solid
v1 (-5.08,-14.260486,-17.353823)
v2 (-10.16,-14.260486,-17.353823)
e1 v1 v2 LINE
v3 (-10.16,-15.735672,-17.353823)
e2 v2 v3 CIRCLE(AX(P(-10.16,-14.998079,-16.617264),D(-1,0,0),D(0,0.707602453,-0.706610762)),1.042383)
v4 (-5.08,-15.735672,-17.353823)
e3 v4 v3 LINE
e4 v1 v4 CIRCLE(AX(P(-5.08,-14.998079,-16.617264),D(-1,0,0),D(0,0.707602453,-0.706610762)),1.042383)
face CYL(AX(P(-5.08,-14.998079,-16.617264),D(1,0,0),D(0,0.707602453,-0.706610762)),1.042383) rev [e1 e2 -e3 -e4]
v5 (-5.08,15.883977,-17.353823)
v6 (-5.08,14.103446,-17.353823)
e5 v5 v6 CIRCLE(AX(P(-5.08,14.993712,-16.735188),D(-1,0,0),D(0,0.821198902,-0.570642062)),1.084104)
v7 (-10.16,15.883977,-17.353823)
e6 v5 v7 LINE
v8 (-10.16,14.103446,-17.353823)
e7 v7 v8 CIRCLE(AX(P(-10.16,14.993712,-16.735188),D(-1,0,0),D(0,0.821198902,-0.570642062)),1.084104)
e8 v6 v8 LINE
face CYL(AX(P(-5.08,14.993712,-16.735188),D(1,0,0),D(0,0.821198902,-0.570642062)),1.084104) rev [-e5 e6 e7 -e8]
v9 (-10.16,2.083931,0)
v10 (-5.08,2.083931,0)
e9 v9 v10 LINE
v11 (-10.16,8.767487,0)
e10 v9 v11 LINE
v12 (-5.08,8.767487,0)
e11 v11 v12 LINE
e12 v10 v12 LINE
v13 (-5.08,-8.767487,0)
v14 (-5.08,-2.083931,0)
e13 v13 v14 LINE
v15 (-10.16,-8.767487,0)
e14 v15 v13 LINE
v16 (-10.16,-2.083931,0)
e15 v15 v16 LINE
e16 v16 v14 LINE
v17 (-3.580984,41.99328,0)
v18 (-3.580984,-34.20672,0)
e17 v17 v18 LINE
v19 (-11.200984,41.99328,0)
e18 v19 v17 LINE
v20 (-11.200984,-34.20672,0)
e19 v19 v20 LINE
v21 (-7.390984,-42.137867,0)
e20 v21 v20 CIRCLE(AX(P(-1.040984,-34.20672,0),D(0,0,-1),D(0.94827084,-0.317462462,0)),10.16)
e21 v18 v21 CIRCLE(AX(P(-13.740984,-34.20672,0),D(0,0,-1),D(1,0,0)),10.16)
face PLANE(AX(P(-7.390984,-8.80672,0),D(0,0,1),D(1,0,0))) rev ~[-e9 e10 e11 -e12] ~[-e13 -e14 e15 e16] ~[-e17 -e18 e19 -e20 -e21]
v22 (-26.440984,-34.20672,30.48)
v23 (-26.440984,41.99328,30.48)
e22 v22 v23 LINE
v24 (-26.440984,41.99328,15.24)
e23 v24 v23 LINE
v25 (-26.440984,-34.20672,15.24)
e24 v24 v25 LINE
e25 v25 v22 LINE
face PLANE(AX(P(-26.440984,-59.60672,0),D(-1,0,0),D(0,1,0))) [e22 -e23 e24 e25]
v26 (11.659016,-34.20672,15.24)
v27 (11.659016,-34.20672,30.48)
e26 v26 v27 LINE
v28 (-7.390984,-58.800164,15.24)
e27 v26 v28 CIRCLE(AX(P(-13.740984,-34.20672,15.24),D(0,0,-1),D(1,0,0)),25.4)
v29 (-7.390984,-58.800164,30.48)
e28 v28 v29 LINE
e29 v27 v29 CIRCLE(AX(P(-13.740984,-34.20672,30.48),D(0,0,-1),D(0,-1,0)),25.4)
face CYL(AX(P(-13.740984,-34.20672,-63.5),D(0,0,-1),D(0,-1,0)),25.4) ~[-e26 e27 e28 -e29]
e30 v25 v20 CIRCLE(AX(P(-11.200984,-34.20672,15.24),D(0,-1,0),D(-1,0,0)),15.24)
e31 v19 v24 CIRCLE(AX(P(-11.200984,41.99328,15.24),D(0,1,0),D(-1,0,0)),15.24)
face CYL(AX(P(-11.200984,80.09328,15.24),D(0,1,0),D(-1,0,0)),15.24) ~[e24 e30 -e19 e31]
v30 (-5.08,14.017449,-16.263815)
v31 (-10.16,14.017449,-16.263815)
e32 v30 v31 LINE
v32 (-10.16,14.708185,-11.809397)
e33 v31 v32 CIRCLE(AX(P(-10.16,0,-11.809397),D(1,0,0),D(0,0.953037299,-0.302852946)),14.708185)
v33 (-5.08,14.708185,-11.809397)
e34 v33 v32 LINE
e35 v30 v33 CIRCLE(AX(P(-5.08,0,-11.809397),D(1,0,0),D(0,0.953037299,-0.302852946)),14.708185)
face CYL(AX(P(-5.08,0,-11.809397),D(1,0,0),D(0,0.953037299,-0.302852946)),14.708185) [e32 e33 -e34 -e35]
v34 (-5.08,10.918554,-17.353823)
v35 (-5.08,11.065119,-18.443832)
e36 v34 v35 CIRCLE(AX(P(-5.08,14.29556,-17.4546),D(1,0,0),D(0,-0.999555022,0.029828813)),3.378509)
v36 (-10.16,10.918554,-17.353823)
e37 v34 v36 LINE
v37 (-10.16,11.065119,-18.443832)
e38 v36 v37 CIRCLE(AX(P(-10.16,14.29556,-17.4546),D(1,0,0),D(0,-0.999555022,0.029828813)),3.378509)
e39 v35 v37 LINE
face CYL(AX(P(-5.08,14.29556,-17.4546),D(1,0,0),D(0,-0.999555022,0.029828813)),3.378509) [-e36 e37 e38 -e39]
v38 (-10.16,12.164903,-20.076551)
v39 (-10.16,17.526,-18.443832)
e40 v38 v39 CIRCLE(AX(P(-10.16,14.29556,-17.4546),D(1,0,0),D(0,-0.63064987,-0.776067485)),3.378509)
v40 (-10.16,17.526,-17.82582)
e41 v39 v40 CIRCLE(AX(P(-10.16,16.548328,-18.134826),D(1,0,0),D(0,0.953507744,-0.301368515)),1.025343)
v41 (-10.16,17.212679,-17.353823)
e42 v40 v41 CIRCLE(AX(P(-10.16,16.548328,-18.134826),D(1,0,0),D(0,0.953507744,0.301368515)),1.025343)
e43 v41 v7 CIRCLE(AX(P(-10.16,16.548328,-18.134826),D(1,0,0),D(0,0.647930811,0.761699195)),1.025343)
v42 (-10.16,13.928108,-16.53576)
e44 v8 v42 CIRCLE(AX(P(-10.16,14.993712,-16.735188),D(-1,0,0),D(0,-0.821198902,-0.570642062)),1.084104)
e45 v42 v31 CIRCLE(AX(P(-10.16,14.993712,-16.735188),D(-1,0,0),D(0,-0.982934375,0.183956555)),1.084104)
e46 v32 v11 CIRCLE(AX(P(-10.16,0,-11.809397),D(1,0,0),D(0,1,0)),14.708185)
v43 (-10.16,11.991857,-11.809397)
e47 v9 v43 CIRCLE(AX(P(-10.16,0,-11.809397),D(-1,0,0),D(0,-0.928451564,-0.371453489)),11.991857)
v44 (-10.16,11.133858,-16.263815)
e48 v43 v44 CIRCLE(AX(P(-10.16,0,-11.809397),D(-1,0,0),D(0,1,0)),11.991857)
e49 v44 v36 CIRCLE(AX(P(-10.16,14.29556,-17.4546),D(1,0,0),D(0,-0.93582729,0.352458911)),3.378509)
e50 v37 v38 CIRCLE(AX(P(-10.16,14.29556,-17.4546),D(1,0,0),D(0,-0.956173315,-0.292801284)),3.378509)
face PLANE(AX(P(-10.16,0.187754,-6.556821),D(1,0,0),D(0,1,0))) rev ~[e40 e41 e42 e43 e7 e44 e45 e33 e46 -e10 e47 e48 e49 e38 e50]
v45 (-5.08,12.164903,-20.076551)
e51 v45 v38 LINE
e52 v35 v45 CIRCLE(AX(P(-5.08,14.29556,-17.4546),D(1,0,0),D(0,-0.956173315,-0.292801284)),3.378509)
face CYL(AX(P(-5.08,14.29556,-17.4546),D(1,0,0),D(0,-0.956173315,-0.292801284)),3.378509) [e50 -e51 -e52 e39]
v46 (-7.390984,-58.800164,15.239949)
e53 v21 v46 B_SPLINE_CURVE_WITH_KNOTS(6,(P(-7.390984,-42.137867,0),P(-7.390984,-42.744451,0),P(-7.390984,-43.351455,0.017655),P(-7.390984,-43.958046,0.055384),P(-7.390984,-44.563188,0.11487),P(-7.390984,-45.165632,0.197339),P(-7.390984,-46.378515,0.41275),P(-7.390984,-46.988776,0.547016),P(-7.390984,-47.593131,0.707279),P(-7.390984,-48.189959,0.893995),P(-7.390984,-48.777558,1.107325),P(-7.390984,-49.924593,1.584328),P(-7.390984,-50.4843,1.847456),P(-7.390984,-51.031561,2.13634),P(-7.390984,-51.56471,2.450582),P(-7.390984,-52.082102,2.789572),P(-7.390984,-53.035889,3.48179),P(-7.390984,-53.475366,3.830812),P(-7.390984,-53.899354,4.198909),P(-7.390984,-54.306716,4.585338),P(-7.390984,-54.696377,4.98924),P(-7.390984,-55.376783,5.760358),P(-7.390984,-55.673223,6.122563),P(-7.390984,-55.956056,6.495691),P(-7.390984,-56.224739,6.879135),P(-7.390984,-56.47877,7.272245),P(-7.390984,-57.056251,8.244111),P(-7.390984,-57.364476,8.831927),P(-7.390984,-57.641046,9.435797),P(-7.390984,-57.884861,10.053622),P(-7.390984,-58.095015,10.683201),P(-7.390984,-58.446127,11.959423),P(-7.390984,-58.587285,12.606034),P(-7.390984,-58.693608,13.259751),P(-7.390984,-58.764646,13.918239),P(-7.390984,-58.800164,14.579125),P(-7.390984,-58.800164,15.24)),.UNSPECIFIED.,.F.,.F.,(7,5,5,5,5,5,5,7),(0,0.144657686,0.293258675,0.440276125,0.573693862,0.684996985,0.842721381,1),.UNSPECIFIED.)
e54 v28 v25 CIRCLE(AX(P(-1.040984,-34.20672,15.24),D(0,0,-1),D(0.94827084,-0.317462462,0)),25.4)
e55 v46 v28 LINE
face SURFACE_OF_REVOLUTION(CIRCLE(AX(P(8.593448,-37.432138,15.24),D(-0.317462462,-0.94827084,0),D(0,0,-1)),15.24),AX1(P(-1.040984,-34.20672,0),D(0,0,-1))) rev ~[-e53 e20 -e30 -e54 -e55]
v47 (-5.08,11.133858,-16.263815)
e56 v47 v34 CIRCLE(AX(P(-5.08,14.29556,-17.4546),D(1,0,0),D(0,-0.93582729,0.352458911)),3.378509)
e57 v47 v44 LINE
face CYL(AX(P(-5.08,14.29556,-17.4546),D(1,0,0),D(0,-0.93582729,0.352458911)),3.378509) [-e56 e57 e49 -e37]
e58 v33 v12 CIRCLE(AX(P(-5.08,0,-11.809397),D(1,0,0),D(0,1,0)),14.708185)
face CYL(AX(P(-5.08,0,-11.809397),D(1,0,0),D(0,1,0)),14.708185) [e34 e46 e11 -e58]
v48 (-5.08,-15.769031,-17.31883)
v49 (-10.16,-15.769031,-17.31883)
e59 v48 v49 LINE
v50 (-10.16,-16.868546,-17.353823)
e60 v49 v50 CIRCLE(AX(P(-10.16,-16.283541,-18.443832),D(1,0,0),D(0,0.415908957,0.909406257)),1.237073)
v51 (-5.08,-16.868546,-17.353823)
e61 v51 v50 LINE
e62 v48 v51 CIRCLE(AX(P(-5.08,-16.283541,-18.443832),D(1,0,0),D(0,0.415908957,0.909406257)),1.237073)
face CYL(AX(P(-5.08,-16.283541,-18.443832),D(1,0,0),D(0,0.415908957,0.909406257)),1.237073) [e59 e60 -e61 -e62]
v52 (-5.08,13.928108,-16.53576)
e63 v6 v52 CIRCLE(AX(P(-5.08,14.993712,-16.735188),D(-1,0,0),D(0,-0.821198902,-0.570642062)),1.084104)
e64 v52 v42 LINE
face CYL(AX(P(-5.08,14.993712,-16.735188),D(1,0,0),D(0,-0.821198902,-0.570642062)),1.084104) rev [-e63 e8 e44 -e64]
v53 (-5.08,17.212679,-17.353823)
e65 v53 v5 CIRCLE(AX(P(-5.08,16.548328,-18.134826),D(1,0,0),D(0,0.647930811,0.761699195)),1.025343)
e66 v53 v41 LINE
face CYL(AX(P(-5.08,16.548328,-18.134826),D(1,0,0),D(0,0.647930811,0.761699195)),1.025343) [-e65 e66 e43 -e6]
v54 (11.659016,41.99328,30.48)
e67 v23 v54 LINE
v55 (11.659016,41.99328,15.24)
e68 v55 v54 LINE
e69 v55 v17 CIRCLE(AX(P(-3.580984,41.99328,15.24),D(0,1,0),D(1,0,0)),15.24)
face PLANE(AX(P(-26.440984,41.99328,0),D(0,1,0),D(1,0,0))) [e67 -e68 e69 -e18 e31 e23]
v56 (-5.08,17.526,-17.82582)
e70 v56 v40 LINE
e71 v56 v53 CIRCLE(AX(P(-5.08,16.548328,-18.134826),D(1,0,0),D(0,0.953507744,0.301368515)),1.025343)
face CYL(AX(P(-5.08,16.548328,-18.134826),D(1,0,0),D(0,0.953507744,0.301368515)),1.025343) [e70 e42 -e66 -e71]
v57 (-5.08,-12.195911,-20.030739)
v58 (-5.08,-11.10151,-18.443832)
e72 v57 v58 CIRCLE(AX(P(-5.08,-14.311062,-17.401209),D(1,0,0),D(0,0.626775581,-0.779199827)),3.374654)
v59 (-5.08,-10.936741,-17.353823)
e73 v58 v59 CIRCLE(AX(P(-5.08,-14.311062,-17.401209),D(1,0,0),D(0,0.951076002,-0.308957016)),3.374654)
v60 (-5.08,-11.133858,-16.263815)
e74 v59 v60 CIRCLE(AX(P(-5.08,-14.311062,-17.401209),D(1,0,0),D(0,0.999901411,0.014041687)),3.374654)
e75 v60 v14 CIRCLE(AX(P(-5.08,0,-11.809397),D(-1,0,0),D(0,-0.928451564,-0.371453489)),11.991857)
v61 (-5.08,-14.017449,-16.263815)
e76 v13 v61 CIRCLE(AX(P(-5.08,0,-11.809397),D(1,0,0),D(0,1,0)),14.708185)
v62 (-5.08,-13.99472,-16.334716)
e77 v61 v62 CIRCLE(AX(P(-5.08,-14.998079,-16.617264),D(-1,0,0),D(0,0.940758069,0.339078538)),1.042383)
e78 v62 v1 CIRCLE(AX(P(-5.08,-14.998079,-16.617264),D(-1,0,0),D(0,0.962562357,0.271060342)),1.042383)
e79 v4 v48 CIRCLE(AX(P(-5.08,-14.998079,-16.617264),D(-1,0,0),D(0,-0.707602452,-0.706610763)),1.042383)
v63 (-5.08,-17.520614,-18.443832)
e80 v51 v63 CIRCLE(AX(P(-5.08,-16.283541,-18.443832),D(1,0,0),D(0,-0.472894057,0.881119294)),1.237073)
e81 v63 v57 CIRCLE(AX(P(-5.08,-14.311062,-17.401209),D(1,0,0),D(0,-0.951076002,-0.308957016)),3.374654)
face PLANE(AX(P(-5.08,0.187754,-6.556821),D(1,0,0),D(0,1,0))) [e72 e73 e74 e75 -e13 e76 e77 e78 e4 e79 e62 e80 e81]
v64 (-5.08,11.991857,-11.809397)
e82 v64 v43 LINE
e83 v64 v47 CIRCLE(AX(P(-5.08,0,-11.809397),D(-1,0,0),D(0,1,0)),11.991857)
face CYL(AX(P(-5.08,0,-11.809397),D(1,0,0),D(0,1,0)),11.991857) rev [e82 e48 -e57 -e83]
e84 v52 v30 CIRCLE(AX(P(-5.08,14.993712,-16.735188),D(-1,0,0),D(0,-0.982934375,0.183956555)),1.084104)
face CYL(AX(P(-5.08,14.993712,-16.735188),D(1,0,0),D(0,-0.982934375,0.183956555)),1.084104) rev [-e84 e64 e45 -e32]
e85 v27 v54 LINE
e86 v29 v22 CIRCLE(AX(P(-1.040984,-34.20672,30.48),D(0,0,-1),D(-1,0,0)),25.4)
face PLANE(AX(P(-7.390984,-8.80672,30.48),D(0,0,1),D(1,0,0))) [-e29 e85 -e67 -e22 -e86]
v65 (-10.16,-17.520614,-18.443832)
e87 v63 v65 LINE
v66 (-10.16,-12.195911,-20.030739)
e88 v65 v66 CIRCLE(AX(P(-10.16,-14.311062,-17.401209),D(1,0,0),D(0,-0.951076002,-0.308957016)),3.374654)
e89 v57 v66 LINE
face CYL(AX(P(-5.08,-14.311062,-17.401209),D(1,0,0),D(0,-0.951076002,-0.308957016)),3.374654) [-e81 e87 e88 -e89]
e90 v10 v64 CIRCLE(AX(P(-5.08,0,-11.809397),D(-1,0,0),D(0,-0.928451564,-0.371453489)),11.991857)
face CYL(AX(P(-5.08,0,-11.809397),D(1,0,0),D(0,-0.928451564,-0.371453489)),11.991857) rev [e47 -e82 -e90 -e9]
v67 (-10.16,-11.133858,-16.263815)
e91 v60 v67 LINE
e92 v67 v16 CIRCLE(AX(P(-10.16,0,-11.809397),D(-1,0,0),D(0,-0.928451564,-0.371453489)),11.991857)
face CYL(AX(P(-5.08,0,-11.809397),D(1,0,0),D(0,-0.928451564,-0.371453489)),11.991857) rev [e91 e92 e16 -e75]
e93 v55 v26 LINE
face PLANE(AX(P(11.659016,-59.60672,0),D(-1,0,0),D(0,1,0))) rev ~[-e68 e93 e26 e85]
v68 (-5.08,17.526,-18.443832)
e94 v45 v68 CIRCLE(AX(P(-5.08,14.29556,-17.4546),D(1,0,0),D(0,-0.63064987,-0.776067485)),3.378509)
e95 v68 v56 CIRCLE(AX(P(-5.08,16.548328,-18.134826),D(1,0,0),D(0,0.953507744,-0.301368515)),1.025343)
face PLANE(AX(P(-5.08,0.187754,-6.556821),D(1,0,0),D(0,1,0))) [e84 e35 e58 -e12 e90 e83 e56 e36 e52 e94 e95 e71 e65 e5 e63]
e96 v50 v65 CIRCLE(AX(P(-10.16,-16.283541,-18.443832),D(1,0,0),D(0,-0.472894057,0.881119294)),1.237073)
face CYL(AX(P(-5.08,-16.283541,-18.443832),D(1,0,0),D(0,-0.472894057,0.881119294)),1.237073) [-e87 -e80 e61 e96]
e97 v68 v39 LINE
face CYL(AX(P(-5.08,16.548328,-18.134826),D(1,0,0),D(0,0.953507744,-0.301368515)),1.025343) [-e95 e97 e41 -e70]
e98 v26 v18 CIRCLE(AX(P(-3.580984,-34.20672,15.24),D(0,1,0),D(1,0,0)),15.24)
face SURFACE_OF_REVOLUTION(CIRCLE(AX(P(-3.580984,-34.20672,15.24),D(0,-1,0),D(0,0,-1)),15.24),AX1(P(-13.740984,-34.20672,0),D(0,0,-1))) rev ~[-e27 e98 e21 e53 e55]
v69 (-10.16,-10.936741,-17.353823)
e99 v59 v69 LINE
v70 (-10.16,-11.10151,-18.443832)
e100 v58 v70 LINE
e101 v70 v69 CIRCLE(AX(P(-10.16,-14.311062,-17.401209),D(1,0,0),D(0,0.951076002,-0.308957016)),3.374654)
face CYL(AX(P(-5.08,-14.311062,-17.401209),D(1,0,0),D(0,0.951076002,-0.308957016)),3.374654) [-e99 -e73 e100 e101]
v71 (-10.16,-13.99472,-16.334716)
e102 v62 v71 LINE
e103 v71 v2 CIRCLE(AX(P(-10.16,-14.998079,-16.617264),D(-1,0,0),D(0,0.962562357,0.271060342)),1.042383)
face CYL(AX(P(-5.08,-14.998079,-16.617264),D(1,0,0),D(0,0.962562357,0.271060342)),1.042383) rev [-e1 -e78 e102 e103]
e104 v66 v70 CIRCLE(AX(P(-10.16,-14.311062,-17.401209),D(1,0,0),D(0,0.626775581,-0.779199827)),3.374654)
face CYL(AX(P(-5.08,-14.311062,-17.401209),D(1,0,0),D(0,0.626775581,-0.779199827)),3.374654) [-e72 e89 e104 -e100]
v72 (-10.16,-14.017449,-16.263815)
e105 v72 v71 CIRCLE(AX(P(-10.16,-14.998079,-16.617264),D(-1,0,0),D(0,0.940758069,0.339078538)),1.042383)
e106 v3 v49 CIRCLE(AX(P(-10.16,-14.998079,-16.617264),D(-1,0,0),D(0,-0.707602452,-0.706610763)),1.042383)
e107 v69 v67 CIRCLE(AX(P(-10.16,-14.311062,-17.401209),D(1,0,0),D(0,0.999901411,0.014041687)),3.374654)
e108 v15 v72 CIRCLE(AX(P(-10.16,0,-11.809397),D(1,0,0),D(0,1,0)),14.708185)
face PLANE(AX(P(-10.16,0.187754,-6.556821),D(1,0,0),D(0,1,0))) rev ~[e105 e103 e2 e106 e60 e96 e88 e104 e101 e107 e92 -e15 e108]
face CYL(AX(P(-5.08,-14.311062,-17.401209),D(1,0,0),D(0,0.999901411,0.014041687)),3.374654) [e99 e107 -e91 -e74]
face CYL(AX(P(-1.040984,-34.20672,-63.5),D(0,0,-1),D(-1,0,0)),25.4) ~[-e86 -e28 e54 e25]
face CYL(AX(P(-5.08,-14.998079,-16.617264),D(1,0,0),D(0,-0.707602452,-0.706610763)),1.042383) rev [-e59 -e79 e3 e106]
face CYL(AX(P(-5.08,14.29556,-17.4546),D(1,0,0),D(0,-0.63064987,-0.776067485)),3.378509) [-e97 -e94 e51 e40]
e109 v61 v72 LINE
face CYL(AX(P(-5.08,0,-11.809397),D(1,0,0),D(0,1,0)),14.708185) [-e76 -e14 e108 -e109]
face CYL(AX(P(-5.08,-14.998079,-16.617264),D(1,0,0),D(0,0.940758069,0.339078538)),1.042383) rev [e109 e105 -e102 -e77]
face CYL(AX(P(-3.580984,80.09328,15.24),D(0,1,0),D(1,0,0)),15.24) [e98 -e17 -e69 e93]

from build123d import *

# Parameters (mm, degrees)
F0_W        = 38.1
F0_H        = 101.6
F1_DEPTH    = 30.48
F2_T1_DEPTH = 157.48
F5_DEPTH    = 5.08
F6_T1_DEPTH = 114.3
F6_T4_ANGLE = 161.4904654603
F6_T6_ANGLE = 161.4904654612


# Not quite as in the source:
# - a fillet or chamfer that OpenCascade refuses, or shapes differently, is made with other operations: its cross-section is extruded or revolved along the edge and cut away or added


with BuildPart() as f1:
    # F0 (on Top) → F1 (new body)
    with BuildSketch(Plane.XY):
        with Locations((-7.3909840986, -8.8067197621)):
            Rectangle(F0_W, F0_H)
    extrude(amount=F1_DEPTH)

    # F2: fillet of radius 25.4 on 2 edges, made by hand

    # F2_s2 → F2_t1 (cut)
    with BuildSketch(Plane.XY.offset(-63.5)):
        with BuildLine():
            ThreePointArc((-13.7409840986, -59.6067197621), (4.2195281435, -52.1672320042), (11.6590159014, -34.2067197621))
            Line((11.6590159014, -34.2067197621), (11.6590159014, -59.6067197621))
            Line((11.6590159014, -59.6067197621), (-13.7409840986, -59.6067197621))
        make_face()
        with BuildLine():
            ThreePointArc((-26.4409840986, -34.2067197621), (-19.0014963408, -52.1672320042), (-1.0409840986, -59.6067197621))
            Line((-1.0409840986, -59.6067197621), (-26.4409840986, -59.6067197621))
            Line((-26.4409840986, -59.6067197621), (-26.4409840986, -34.2067197621))
        make_face()
    extrude(amount=F2_T1_DEPTH, mode=Mode.SUBTRACT)

    # F4 (on offset) → F5 (join)
    with BuildSketch(Plane.YZ.offset(-5.08)):
        with BuildLine():
            Line((-14.0174488836, -16.263814643), (-11.133858472, -16.263814643))
            ThreePointArc((-11.133858472, -16.263814643), (-2.2681486848, -0.0339935381), (11.991857098, -11.8093974888))
            ThreePointArc((11.991857098, -11.8093974888), (11.7754039507, -14.0775461736), (11.133858472, -16.263814643))
            Line((11.133858472, -16.263814643), (14.0174488836, -16.263814643))
            ThreePointArc((14.0174488836, -16.263814643), (14.5344751626, -14.0632247081), (14.7081849794, -11.8093974888))
            ThreePointArc((14.7081849794, -11.8093974888), (-2.2538272193, 2.7250776738), (-14.0174488836, -16.263814643))
        make_face()
        with BuildLine():
            ThreePointArc((-10.936740827, -17.3538234085), (-10.9902716166, -16.8006761373), (-11.133858472, -16.263814643))
            Line((-11.133858472, -16.263814643), (-14.0174488836, -16.263814643))
            ThreePointArc((-14.0174488836, -16.263814643), (-14.0054514358, -16.2990621553), (-13.9947204643, -16.3347156561))
            ThreePointArc((-13.9947204643, -16.3347156561), (-13.8183302749, -16.8476961899), (-13.6231437858, -17.3538234085))
            Line((-13.6231437858, -17.3538234085), (-10.936740827, -17.3538234085))
        make_face()
        with BuildLine():
            Line((14.0174488836, -16.263814643), (11.133858472, -16.263814643))
            ThreePointArc((11.133858472, -16.263814643), (10.9810910084, -16.799907635), (10.9185537399, -17.3538234085))
            Line((10.9185537399, -17.3538234085), (13.6231437858, -17.3538234085))
            ThreePointArc((13.6231437858, -17.3538234085), (13.781697315, -16.9470549808), (13.9281083774, -16.5357599818))
            ThreePointArc((13.9281083774, -16.5357599818), (13.9637636905, -16.3968256904), (14.0174488836, -16.263814643))
        make_face()
        with BuildLine():
            ThreePointArc((-11.1015096713, -18.4438321739), (-10.9743154761, -17.9056013647), (-10.936740827, -17.3538234085))
            Line((-10.936740827, -17.3538234085), (-13.6231437858, -17.3538234085))
            ThreePointArc((-13.6231437858, -17.3538234085), (-13.3861112566, -17.9038811268), (-13.1268801243, -18.4438321739))
            Line((-13.1268801243, -18.4438321739), (-11.1015096713, -18.4438321739))
        make_face()
        with BuildLine():
            Line((13.6231437858, -17.3538234085), (10.9185537399, -17.3538234085))
            ThreePointArc((10.9185537399, -17.3538234085), (10.9471844464, -17.9048318245), (11.0651192382, -18.4438321739))
            Line((11.0651192382, -18.4438321739), (13.1268801243, -18.4438321739))
            ThreePointArc((13.1268801243, -18.4438321739), (13.3861112566, -17.9038811268), (13.6231437858, -17.3538234085))
        make_face()
        with BuildLine():
            ThreePointArc((-13.6231437858, -17.3538234085), (-13.8183302749, -16.8476961899), (-13.9947204643, -16.3347156561))
            ThreePointArc((-13.9947204643, -16.3347156561), (-13.9894299583, -16.8803028031), (-14.2604863377, -17.3538234085))
            Line((-14.2604863377, -17.3538234085), (-13.6231437858, -17.3538234085))
        make_face()
        with BuildLine():
            ThreePointArc((-13.1268801243, -18.4438321739), (-13.3861112566, -17.9038811268), (-13.6231437858, -17.3538234085))
            Line((-13.6231437858, -17.3538234085), (-14.2604863377, -17.3538234085))
            ThreePointArc((-14.2604863377, -17.3538234085), (-14.9980791155, -17.659647367), (-15.7356718933, -17.3538234085))
            Line((-15.7356718933, -17.3538234085), (-16.868545512, -17.3538234085))
            ThreePointArc((-16.868545512, -17.3538234085), (-17.3451536393, -17.8087510018), (-17.5206139684, -18.4438321739))
            Line((-17.5206139684, -18.4438321739), (-13.1268801243, -18.4438321739))
        make_face()
        with BuildLine():
            ThreePointArc((-12.195911288, -20.0307388176), (-11.5329900367, -19.3170914758), (-11.1015096713, -18.4438321739))
            Line((-11.1015096713, -18.4438321739), (-13.1268801243, -18.4438321739))
            ThreePointArc((-13.1268801243, -18.4438321739), (-12.6862330658, -19.2518564902), (-12.195911288, -20.0307388176))
        make_face()
        with BuildLine():
            ThreePointArc((14.1034464611, -17.3538234085), (13.9336822531, -16.962387408), (13.9281083774, -16.5357599818))
            ThreePointArc((13.9281083774, -16.5357599818), (13.781697315, -16.9470549808), (13.6231437858, -17.3538234085))
            Line((13.6231437858, -17.3538234085), (14.1034464611, -17.3538234085))
        make_face()
        with BuildLine():
            Line((14.1034464611, -17.3538234085), (13.6231437858, -17.3538234085))
            ThreePointArc((13.6231437858, -17.3538234085), (13.3861112566, -17.9038811268), (13.1268801243, -18.4438321739))
            Line((13.1268801243, -18.4438321739), (17.526, -18.4438321739))
            Line((17.526, -18.4438321739), (17.526, -17.8258201323))
            ThreePointArc((17.526, -17.8258201323), (17.4025849977, -17.5677526977), (17.2126789083, -17.3538234085))
            Line((17.2126789083, -17.3538234085), (15.8839765936, -17.3538234085))
            ThreePointArc((15.8839765936, -17.3538234085), (14.9937115274, -17.8192920932), (14.1034464611, -17.3538234085))
        make_face()
        with BuildLine():
            Line((13.1268801243, -18.4438321739), (11.0651192382, -18.4438321739))
            ThreePointArc((11.0651192382, -18.4438321739), (11.4934563351, -19.3420700335), (12.1649032036, -20.0765514995))
            ThreePointArc((12.1649032036, -20.0765514995), (12.6722144503, -19.2757008789), (13.1268801243, -18.4438321739))
        make_face()
        with BuildLine():
            ThreePointArc((-12.195911288, -20.0307388176), (-12.6862330658, -19.2518564902), (-13.1268801243, -18.4438321739))
            Line((-13.1268801243, -18.4438321739), (-17.5206139684, -18.4438321739))
            ThreePointArc((-17.5206139684, -18.4438321739), (-15.2749066717, -20.6352919031), (-12.195911288, -20.0307388176))
        make_face()
        with BuildLine():
            Line((17.526, -18.4438321739), (13.1268801243, -18.4438321739))
            ThreePointArc((13.1268801243, -18.4438321739), (12.6722144503, -19.2757008789), (12.1649032036, -20.0765514995))
            ThreePointArc((12.1649032036, -20.0765514995), (15.2798483428, -20.6865502684), (17.526, -18.4438321739))
        make_face()
        with BuildLine():
            Line((-16.868545512, -17.3538234085), (-15.7356718933, -17.3538234085))
            ThreePointArc((-15.7356718933, -17.3538234085), (-15.7525545617, -17.3365203222), (-15.769031426, -17.3188303749))
            ThreePointArc((-15.769031426, -17.3188303749), (-16.3228921506, -17.2073853467), (-16.868545512, -17.3538234085))
        make_face()
        with BuildLine():
            ThreePointArc((17.2126789083, -17.3538234085), (16.548327751, -17.1094834068), (15.8839765936, -17.3538234085))
            Line((15.8839765936, -17.3538234085), (17.2126789083, -17.3538234085))
        make_face()
        with BuildLine():
            ThreePointArc((17.526, -18.4438321739), (17.5736704973, -18.1348261531), (17.526, -17.8258201323))
            Line((17.526, -17.8258201323), (17.526, -18.4438321739))
        make_face()
    extrude(amount=-F5_DEPTH)

    # F6: fillet of radius 15.24 on 4 edges, made by hand

    # F6_s2 → F6_t1 (cut)
    with BuildSketch(Plane.XZ.offset(-80.0932802379)):
        with BuildLine():
            ThreePointArc((11.6590159014, 15.24), (7.1953232467, 4.4636926547), (-3.5809840986, 0))
            Line((-3.5809840986, 0), (11.6590159014, 0))
            Line((11.6590159014, 0), (11.6590159014, 15.24))
        make_face()
        with BuildLine():
            ThreePointArc((-26.4409840986, 15.24), (-21.9772914439, 4.4636926547), (-11.2009840986, 0))
            Line((-11.2009840986, 0), (-26.4409840986, 0))
            Line((-26.4409840986, 0), (-26.4409840986, 15.24))
        make_face()
    extrude(amount=F6_T1_DEPTH, mode=Mode.SUBTRACT)

    # F6_s3 → F6_t4 (revolve, cut)
    with BuildSketch(Plane.XZ.offset(34.206719762)):
        with BuildLine():
            ThreePointArc((-3.5809840986, 0), (7.1953232467, 4.4636926547), (11.6590159014, 15.24))
            Line((11.6590159014, 15.24), (11.6590159014, 0))
            Line((11.6590159014, 0), (-3.5809840986, 0))
        make_face()
    revolve(axis=Axis((-13.7409840987, -34.206719762, 0), (0, 0, -1)), revolution_arc=F6_T4_ANGLE, mode=Mode.SUBTRACT)

    # F6_s5 → F6_t6 (revolve, cut)
    with BuildSketch(Plane(origin=(-10.402517324, -31.0726622139, 0), x_dir=(0, 0, 1), z_dir=(0.3174624617, 0.9482708397, 0))):
        with BuildLine():
            ThreePointArc((0, 20.0322145968), (4.4636926547, 30.8085219421), (15.24, 35.2722145968))
            Line((15.24, 35.2722145968), (0, 35.2722145968))
            Line((0, 35.2722145968), (0, 20.0322145968))
        make_face()
    revolve(axis=Axis((-1.0409840986, -34.2067197621, 0), (0, 0, -1)), revolution_arc=F6_T6_ANGLE, mode=Mode.SUBTRACT)


solid = f1.part
